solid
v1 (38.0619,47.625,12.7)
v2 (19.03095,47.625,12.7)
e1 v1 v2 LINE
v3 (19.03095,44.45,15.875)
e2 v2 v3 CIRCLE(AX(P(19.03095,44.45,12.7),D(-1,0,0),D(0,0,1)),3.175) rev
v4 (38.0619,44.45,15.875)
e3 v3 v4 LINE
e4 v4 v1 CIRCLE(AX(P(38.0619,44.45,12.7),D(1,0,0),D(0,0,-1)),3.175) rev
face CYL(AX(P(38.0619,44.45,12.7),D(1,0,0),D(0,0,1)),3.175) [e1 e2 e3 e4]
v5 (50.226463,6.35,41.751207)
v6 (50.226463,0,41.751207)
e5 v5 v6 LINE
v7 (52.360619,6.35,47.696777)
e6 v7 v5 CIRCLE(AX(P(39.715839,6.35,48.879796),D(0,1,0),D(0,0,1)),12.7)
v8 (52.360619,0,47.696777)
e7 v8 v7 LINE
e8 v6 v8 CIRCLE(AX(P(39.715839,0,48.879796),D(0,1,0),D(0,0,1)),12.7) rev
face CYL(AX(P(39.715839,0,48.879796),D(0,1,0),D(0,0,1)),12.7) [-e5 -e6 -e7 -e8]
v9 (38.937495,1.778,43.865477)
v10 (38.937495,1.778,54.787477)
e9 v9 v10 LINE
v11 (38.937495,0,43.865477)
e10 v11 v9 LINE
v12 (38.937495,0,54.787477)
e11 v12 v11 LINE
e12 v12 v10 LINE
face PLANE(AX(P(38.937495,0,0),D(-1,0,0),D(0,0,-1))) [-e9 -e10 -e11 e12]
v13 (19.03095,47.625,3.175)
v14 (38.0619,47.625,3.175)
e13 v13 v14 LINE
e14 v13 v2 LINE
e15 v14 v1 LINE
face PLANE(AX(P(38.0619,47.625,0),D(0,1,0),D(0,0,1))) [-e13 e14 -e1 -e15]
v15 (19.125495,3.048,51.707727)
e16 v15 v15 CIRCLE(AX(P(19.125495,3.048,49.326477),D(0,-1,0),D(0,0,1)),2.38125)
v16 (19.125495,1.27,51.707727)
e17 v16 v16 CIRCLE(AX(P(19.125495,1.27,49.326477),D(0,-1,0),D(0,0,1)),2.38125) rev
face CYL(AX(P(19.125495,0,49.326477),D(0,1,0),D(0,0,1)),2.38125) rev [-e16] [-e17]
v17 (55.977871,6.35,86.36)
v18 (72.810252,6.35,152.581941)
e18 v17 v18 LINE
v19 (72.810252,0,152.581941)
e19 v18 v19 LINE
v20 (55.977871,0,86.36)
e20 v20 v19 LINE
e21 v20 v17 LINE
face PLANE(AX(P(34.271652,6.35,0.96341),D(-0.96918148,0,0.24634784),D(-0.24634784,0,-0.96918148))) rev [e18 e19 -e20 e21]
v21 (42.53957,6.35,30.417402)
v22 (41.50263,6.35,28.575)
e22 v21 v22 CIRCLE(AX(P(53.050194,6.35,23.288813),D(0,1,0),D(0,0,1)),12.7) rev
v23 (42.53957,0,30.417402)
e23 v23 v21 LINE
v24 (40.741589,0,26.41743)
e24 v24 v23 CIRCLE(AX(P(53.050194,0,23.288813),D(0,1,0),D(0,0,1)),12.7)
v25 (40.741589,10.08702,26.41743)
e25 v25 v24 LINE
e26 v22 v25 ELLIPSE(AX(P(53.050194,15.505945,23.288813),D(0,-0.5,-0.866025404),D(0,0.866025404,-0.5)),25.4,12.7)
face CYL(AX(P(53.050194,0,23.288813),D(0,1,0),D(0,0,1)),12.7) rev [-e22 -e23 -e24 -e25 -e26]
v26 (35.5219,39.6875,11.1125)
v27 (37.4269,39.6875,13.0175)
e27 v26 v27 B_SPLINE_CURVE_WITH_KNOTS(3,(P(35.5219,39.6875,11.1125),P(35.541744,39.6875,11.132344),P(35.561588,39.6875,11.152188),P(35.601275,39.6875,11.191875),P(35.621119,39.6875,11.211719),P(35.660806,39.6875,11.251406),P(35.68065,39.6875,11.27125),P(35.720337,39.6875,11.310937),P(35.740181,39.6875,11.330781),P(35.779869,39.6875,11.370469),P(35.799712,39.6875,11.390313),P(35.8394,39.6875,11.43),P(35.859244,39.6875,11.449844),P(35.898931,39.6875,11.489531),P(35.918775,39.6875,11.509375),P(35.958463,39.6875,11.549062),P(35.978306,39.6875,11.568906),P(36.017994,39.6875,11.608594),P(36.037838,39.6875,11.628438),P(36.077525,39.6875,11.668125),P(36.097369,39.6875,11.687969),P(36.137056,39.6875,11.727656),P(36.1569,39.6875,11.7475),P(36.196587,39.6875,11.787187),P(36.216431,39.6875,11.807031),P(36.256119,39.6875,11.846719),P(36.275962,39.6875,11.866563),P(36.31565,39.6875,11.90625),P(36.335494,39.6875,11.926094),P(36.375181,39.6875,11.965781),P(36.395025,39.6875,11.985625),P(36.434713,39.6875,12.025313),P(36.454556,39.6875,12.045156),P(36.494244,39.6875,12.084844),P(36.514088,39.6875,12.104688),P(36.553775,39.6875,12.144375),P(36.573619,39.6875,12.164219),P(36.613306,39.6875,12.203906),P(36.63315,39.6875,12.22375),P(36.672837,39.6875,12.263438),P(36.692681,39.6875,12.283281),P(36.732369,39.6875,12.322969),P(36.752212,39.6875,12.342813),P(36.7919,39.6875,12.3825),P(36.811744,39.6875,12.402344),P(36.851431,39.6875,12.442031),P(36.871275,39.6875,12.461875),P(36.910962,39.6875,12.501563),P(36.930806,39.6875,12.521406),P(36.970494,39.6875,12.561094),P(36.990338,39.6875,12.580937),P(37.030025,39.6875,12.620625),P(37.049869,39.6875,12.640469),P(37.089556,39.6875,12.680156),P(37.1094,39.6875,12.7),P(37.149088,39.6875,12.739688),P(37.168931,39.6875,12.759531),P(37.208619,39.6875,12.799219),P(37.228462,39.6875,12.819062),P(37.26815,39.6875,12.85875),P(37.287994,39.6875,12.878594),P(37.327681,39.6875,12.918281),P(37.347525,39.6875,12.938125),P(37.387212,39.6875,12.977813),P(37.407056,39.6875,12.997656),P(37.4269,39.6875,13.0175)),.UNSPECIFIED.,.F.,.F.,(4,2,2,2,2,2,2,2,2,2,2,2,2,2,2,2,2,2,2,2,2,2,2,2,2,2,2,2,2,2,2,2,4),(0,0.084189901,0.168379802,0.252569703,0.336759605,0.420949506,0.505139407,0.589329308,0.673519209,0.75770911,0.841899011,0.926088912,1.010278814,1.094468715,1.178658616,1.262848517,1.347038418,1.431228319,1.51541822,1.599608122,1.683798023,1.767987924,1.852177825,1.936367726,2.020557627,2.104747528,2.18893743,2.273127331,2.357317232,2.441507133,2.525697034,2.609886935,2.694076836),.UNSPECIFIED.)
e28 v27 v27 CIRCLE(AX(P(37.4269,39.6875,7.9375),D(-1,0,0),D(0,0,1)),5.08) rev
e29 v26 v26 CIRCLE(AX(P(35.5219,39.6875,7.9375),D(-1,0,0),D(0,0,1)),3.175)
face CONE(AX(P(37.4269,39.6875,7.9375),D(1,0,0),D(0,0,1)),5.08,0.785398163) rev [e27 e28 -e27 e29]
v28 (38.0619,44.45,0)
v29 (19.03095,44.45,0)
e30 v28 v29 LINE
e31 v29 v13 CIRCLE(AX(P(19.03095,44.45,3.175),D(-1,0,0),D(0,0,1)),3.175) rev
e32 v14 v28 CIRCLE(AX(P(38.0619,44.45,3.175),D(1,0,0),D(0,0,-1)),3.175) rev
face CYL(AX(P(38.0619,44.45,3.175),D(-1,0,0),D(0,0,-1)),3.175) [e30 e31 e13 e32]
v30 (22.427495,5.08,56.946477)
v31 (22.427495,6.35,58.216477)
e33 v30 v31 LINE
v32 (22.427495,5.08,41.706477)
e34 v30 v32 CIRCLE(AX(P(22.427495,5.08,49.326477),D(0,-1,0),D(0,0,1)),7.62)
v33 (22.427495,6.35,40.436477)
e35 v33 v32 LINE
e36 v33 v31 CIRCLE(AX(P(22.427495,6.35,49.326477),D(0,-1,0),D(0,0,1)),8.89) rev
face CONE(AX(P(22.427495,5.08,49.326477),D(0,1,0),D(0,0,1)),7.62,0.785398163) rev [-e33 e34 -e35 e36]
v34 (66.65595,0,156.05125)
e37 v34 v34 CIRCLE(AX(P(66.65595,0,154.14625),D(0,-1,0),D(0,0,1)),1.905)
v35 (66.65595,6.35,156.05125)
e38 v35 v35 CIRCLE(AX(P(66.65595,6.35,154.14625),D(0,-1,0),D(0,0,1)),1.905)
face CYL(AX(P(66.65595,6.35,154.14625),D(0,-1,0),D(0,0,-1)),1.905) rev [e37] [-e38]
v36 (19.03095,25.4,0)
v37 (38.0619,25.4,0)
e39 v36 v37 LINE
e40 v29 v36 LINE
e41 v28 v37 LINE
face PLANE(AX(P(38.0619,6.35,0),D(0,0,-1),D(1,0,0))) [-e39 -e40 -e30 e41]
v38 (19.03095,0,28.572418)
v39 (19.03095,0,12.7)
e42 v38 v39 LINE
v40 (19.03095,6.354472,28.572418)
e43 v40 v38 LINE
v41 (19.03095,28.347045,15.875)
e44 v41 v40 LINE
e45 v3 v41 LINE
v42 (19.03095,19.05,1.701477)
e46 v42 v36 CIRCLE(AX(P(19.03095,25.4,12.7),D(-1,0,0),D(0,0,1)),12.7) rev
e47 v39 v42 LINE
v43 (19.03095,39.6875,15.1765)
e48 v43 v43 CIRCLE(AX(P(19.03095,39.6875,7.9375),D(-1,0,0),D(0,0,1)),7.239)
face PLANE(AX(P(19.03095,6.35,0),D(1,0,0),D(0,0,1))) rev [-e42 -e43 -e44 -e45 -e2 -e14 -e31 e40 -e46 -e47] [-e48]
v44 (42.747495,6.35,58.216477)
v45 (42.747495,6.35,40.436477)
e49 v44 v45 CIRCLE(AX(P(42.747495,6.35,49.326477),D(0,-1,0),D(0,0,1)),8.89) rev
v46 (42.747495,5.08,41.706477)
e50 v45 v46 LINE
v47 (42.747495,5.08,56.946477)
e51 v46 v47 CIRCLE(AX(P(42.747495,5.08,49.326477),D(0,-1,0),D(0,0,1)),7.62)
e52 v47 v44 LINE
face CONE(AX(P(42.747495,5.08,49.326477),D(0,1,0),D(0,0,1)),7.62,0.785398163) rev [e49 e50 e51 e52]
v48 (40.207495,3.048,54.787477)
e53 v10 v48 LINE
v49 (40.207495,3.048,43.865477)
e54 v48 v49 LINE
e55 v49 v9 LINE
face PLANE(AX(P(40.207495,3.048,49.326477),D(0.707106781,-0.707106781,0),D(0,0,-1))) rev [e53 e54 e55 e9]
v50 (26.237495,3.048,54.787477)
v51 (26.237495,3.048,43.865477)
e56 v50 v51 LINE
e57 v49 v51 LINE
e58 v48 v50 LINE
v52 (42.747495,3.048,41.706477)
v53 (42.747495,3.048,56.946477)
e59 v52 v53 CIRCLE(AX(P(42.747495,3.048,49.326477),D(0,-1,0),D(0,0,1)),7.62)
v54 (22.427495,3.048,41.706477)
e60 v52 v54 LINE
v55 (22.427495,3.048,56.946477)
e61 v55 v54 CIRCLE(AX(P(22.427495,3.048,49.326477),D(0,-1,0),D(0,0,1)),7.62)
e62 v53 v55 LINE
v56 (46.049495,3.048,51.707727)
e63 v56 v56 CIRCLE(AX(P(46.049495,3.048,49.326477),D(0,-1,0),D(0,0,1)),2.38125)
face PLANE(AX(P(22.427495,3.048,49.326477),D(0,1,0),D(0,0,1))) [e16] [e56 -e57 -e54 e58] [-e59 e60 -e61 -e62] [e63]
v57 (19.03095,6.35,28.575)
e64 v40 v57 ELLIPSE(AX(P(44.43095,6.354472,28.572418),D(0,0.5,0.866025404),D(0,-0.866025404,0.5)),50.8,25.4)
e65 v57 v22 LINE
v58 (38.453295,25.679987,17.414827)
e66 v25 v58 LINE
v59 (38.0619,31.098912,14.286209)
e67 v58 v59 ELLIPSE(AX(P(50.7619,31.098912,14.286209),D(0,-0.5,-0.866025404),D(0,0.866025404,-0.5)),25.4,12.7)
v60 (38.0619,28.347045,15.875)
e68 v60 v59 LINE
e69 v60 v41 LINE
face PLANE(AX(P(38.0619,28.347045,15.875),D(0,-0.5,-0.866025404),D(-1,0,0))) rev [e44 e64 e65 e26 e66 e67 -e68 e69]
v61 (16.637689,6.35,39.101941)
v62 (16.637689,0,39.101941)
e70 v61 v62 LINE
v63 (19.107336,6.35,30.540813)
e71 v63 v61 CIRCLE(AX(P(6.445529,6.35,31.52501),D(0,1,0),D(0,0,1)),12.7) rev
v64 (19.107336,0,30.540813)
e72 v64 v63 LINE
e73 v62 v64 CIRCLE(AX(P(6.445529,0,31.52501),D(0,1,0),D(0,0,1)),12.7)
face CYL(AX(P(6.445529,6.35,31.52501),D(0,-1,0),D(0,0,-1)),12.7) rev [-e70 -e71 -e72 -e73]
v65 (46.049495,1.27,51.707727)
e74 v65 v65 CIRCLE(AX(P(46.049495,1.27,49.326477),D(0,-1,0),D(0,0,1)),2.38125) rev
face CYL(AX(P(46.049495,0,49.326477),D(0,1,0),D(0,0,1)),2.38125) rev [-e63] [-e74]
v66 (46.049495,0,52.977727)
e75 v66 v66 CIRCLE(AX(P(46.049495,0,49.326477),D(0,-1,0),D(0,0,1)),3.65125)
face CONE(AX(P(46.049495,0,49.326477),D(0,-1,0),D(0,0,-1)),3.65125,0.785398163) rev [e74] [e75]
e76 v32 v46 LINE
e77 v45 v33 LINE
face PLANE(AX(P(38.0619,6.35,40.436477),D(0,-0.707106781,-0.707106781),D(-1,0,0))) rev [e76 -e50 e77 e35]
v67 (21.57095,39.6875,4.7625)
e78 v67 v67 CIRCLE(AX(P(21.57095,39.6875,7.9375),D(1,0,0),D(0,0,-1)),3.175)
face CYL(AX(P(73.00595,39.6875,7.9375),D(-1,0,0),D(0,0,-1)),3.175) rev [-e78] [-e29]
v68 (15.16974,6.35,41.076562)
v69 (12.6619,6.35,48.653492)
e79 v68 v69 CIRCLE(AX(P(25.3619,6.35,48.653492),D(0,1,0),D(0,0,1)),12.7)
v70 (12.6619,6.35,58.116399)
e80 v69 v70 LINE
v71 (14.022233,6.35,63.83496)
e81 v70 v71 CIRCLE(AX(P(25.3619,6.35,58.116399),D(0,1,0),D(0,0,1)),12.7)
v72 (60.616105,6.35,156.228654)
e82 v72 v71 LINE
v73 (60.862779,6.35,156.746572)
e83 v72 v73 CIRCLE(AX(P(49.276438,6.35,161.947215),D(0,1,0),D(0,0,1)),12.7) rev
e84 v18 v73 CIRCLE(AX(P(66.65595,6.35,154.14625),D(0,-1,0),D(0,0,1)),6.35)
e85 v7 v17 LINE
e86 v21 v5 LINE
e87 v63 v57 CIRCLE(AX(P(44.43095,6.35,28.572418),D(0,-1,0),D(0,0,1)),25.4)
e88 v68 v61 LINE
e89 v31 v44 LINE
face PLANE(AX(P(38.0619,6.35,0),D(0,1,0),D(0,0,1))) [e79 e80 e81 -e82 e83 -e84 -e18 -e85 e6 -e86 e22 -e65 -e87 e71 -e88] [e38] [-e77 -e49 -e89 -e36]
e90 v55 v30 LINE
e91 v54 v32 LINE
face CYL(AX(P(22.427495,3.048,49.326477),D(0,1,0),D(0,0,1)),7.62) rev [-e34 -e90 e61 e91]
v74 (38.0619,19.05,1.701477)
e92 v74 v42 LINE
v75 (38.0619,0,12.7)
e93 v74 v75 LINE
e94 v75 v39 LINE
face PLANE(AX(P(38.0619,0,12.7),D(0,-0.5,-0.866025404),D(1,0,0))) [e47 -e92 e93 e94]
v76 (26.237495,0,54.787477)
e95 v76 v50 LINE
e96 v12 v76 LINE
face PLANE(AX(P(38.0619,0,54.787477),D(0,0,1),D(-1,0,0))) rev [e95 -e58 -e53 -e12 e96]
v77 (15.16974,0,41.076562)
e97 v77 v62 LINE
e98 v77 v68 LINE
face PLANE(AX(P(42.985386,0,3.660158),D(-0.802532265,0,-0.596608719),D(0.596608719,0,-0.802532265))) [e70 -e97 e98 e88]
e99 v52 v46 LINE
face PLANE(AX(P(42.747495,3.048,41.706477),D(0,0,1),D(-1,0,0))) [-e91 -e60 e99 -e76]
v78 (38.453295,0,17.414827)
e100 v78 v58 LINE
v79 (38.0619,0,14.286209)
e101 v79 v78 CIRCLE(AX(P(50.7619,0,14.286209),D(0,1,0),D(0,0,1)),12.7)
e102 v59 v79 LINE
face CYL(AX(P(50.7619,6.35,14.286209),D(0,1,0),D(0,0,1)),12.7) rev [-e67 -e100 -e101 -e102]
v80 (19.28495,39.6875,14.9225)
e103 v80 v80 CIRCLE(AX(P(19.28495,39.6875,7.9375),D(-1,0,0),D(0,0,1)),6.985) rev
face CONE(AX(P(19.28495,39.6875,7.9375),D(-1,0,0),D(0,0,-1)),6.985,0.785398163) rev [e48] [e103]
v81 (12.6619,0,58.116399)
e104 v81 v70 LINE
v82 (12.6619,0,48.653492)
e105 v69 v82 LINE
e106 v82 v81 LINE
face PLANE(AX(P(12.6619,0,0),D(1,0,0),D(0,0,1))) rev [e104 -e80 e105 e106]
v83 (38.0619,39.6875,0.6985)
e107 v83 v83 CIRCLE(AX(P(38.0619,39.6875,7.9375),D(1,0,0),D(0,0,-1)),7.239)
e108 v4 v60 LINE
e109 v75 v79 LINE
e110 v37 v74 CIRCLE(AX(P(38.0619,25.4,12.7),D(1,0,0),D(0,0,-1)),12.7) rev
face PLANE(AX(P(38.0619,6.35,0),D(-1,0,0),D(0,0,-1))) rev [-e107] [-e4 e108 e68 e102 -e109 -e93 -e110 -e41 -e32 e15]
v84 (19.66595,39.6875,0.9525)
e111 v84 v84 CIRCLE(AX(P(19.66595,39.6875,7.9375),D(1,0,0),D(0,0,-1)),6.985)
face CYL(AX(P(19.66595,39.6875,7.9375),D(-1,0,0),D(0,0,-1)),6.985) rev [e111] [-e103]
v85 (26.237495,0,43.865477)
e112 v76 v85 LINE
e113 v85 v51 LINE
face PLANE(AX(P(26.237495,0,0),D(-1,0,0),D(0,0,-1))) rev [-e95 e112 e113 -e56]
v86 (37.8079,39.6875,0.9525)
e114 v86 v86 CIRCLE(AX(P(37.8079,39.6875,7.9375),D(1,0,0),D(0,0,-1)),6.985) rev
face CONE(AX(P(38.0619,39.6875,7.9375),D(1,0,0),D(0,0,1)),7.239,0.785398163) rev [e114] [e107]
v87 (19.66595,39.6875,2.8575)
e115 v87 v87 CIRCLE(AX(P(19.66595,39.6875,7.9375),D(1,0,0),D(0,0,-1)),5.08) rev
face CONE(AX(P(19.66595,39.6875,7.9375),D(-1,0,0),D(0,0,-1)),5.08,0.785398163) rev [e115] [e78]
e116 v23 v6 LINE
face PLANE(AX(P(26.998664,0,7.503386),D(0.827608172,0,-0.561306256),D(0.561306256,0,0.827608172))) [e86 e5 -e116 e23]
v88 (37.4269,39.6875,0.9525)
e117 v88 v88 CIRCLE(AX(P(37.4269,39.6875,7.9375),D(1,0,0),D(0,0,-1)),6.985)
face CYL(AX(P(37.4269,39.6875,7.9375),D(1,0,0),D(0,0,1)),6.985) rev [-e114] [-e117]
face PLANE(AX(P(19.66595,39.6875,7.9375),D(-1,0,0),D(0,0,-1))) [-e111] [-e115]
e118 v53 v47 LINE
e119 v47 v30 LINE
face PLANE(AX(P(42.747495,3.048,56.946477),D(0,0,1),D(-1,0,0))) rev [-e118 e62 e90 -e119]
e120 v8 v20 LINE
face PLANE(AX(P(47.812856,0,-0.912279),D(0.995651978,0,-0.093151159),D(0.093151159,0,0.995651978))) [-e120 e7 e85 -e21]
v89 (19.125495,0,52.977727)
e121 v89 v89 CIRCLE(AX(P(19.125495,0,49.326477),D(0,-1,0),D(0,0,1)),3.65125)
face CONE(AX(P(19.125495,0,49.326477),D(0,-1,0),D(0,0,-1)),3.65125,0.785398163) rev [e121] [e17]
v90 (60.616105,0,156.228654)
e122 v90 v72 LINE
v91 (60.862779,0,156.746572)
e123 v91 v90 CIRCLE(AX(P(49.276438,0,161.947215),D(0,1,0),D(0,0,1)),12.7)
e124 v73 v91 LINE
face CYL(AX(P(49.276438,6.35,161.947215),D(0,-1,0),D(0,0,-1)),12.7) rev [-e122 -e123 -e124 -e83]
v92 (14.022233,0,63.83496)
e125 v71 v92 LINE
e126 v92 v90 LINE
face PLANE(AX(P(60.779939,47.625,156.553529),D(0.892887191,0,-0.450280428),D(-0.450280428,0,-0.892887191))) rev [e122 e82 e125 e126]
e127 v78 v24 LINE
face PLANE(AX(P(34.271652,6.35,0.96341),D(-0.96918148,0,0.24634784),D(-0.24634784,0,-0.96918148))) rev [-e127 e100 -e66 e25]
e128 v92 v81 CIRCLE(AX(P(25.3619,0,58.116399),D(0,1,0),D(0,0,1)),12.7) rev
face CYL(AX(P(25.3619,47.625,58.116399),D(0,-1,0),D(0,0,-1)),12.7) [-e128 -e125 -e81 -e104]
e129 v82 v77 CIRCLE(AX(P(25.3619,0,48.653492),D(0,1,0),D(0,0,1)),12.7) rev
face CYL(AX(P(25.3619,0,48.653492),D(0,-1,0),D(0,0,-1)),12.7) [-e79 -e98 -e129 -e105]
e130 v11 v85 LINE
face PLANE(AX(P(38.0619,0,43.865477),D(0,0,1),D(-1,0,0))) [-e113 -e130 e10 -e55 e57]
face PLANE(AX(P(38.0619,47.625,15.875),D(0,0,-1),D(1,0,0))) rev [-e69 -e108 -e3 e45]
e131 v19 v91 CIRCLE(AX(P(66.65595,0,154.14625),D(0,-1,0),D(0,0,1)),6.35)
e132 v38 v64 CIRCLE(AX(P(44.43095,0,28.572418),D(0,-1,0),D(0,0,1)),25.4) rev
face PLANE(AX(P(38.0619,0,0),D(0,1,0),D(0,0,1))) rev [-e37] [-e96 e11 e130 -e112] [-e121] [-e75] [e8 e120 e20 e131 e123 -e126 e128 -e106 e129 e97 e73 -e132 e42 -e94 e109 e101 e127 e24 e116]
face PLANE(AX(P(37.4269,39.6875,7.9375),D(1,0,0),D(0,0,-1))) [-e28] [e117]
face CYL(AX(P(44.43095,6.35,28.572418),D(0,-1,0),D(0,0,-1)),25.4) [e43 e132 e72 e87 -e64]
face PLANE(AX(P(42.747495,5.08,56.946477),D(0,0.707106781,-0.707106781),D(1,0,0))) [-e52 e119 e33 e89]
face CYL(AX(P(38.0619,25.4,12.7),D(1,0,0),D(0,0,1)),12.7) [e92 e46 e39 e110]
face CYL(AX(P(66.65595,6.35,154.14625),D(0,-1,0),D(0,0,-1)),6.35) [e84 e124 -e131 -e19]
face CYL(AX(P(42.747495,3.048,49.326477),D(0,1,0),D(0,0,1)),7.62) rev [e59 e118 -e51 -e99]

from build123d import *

# Parameters (mm, degrees)
SKETCH1_R           = 6.35
SKETCH1_R_2         = 1.905
BOSS_EXTRUDE1_DEPTH = 6.35
FILLET2_R           = 25.4
SKETCH2_W           = 19.03095
SKETCH2_H           = 15.875
BOSS_EXTRUDE2_DEPTH = 41.275
SKETCH3_R           = 3.175
CUT_EXTRUDE1_DEPTH  = 176.899083324
SKETCH4_R           = 6.985
CUT_EXTRUDE2_DEPTH  = 0.635
CHAMFER1_SIZE       = 0.254
CHAMFER2_SIZE       = 1.905
FILLET3_R           = 3.175
CHAMFER3_SIZE       = 12.7
CHAMFER3_SIZE2      = 21.997045256
SKETCH6_R           = 1.905
BOSS_EXTRUDE3_DEPTH = 6.35
CUT_EXTRUDE3_DEPTH  = 6.35
FILLET4_R           = 6.35
CHAMFER5_SIZE       = 12.7
CHAMFER5_SIZE2      = 21.997045256
FILLET5_R           = 12.7
SKETCH7_R           = 1.905
BOSS_EXTRUDE4_DEPTH = 6.35
CUT_EXTRUDE4_DEPTH  = 170.362801463
CUT_EXTRUDE5_DEPTH  = 3.302
SKETCH10_3_R        = 2.38125
SKETCH10_3_W        = 12.7
SKETCH10_3_H        = 10.922
CUT_EXTRUDE6_DEPTH  = 170.362801463
CHAMFER6_SIZE       = 1.27
CHAMFER7_SIZE       = 1.27
CUT_EXTRUDE7_DEPTH  = 183.63914045
FILLET6_R           = 12.7


with BuildPart() as part:
    # Sketch1 → Boss-Extrude1 (new body)
    # profile 1 of 2: a face of its own
    with BuildSketch(Plane(origin=(0, 0, 0), x_dir=(1, 0, 0), z_dir=(0, 1, 0))):
        with BuildLine():
            Line((0, -15.875), (-34.748352364, -152.581941075))
            ThreePointArc((-34.748352364, -152.581941075), (-27.805798775, -147.845364348), (-22.24405, -154.14625))
            ThreePointArc((-22.24405, -154.14625), (-22.363673933, -155.372999389), (-22.718038681, -156.553528751))
            Line((-22.718038681, -156.553528751), (3.697461152, -92.075))
            Line((3.697461152, -92.075), (19.03095, -31.75))
            Line((19.03095, -31.75), (19.03095, 0))
            Line((19.03095, 0), (0, 0))
            Line((0, 0), (0, -15.875))
        make_face()
    # profile 2 of 2: a face of its own
    with BuildSketch(Plane(origin=(0, 0, 0), x_dir=(1, 0, 0), z_dir=(0, 1, 0))):
        with Locations((-28.59405, -154.14625)):
            Circle(SKETCH1_R)
        with Locations(Location((-28.59405, -154.14625, 0), (0, 0, 270))):
            Circle(SKETCH1_R_2, mode=Mode.SUBTRACT)
    extrude(amount=BOSS_EXTRUDE1_DEPTH)

    # Fillet2
    fillet2_edges = [part.edges().sort_by_distance(p)[0] for p in [
        (19.03095, 3.175, 31.75),
        (3.697461152, 3.175, 92.075),
    ]]
    fillet(fillet2_edges, radius=FILLET2_R)

    # Sketch2 → Boss-Extrude2 (add)
    with BuildSketch(Plane(origin=(0, 6.35, 0), x_dir=(1, 0, 0), z_dir=(0, 1, 0))):
        with Locations((9.515475, -7.9375)):
            Rectangle(SKETCH2_W, SKETCH2_H)
    extrude(amount=BOSS_EXTRUDE2_DEPTH)

    # Sketch3 → Cut-Extrude1 (cut, through all)
    with BuildSketch(Plane(origin=(19.03095, 0, 0), x_dir=(0, 0, -1), z_dir=(1, 0, 0))):
        with Locations((-7.9375, 39.6875)):
            Circle(SKETCH3_R)
    extrude(amount=-CUT_EXTRUDE1_DEPTH, mode=Mode.SUBTRACT)

    # Sketch4 → Cut-Extrude2 (cut)
    with BuildSketch(Plane(origin=(19.03095, 0, 0), x_dir=(0, 0, -1), z_dir=(1, 0, 0))):
        with Locations((-7.9375, 39.6875)):
            Circle(SKETCH4_R)
    cut_extrude2 = extrude(amount=-CUT_EXTRUDE2_DEPTH, mode=Mode.SUBTRACT)

    # Mirror1: Cut-Extrude2 across plane
    add(cut_extrude2.mirror(Plane(origin=(9.515475, 0, 0), x_dir=(0, 0, 1), z_dir=(1, 0, 0))), mode=Mode.SUBTRACT)

    # Chamfer1
    chamfer1_edges = [part.edges().sort_by_distance(p)[0] for p in [
        (19.03095, 39.6875, 14.9225),
        (0, 39.6875, 14.9225),
    ]]
    chamfer(chamfer1_edges, length=CHAMFER1_SIZE)

    # Chamfer2
    chamfer2_edges = [part.edges().sort_by_distance(p)[0] for p in [
        (18.39595, 39.6875, 11.1125),
        (0.635, 39.6875, 11.1125),
    ]]
    chamfer(chamfer2_edges, length=CHAMFER2_SIZE)

    # Fillet3
    fillet3_edges = [part.edges().sort_by_distance(p)[0] for p in [
        (9.515475, 47.625, 0),
        (9.515475, 47.625, 15.875),
    ]]
    fillet(fillet3_edges, radius=FILLET3_R)

    # Chamfer3
    chamfer3_edges = [part.edges().sort_by_distance(p)[0] for p in [
        (9.515475, 6.35, 15.875),
    ]]
    chamfer3_side = [part.faces().sort_by_distance(p)[0] for p in [
        (-6.326800104, 6.35, 82.033556201),
    ]]
    chamfer(chamfer3_edges, length=CHAMFER3_SIZE, length2=CHAMFER3_SIZE2, reference=chamfer3_side[0])

    # Sketch6 → Boss-Extrude3 (add)
    # profile 1 of 2: a face of its own
    with BuildSketch(Plane(origin=(0, 6.35, 0), x_dir=(1, 0, 0), z_dir=(0, 1, 0))):
        with BuildLine():
            Line((-8.255, -44.45), (-6.925228458, -43.120228458))
            Line((-6.925228458, -43.120228458), (-3.228102915, -28.575))
            Line((-3.228102915, -28.575), (-13.99495746, -44.45))
            Line((-13.99495746, -44.45), (-15.073361931, -55.976593532))
            ThreePointArc((-15.073361931, -55.976593532), (-20.292390061, -61.638490142), (-16.214172451, -68.17021801))
            Line((-16.214172451, -68.17021801), (-17.91597118, -86.36))
            Line((-17.91597118, -86.36), (-8.255, -48.351814634))
            Line((-8.255, -48.351814634), (-8.255, -44.45))
        make_face()
        with Locations(Location((-13.97, -62.23, 0), (0, 0, 270))):
            Circle(SKETCH6_R, mode=Mode.SUBTRACT)
    # profile 2 of 2: a face of its own
    with BuildSketch(Plane(origin=(0, 6.35, 0), x_dir=(1, 0, 0), z_dir=(0, 1, 0))):
        with BuildLine():
            Line((18.248159602, -34.82965338), (4.135908565, -90.350060527))
            ThreePointArc((4.135908565, -90.350060527), (3.638321539, -92.055476142), (3.022744588, -93.721939549))
            Line((3.022744588, -93.721939549), (-22.718038594, -156.553528537))
            Line((-22.718038594, -156.553528537), (25.4, -86.36))
            Line((25.4, -86.36), (25.4, -68.58))
            ThreePointArc((25.4, -68.58), (31.75, -62.23), (25.4, -55.88))
            Line((25.4, -55.88), (25.4, -44.45))
            Line((25.4, -44.45), (18.248159602, -34.82965338))
        make_face()
        with Locations(Location((25.4, -62.23, 0), (0, 0, 270))):
            Circle(SKETCH6_R, mode=Mode.SUBTRACT)
    extrude(amount=-BOSS_EXTRUDE3_DEPTH)

    # Sketch6<3> → Cut-Extrude3 (cut)
    with BuildSketch(Plane(origin=(0, 6.35, 0), x_dir=(1, 0, 0), z_dir=(0, 1, 0))):
        Polygon((-1.905, -38.1), (13.335, -38.1), (19.685, -44.45), (19.685, -86.36), (-8.255, -86.36), (-8.255, -44.45), align=None)
    extrude(amount=-CUT_EXTRUDE3_DEPTH, mode=Mode.SUBTRACT)

    # Fillet4
    fillet4_edges = [part.edges().sort_by_distance(p)[0] for p in [
        (25.4, 3.175, 55.88),
        (25.4, 3.175, 68.58),
        (25.4, 3.175, 86.36),
        (-16.214172451, 3.175, 68.17021801),
        (-15.073361931, 3.175, 55.976593532),
    ]]
    fillet(fillet4_edges, radius=FILLET4_R)

    # Chamfer5
    chamfer5_edges = [part.edges().sort_by_distance(p)[0] for p in [
        (9.515475, 0, 0),
    ]]
    chamfer5_side = [part.faces().sort_by_distance(p)[0] for p in [
        (-0.648785112, 0, 121.285485339),
    ]]
    chamfer(chamfer5_edges, length=CHAMFER5_SIZE, length2=CHAMFER5_SIZE2, reference=chamfer5_side[0])

    # Fillet5
    fillet5_edges = [part.edges().sort_by_distance(p)[0] for p in [
        (9.515475, 21.997045256, 0),
    ]]
    fillet(fillet5_edges, radius=FILLET5_R)

    # Sketch7 → Boss-Extrude4 (add)
    with BuildSketch(Plane(origin=(0, 6.35, 0), x_dir=(1, 0, 0), z_dir=(0, 1, 0))):
        with Locations((-13.97, -62.23)):
            Circle(SKETCH7_R)
        with Locations((25.4, -62.23)):
            Circle(SKETCH7_R)
        Polygon((-8.255, -86.36), (19.685, -86.36), (19.685, -44.45), (13.335, -38.1), (-1.905, -38.1), (-8.255, -44.45), align=None)
    extrude(amount=-BOSS_EXTRUDE4_DEPTH)

    # Sketch9 → Cut-Extrude4 (cut, through all)
    with BuildSketch(Plane(origin=(0, 6.35, 0), x_dir=(1, 0, 0), z_dir=(0, 1, 0))):
        with BuildLine():
            Line((-14.727319743, -52.277899988), (-16.560214639, -71.868911554))
            ThreePointArc((-16.560214639, -71.868911554), (-16.917171132, -69.101142904), (-18.42630235, -66.753700848))
            ThreePointArc((-18.42630235, -66.753700848), (-20.292390061, -61.638490142), (-17.509854902, -56.958195065))
            ThreePointArc((-17.509854902, -56.958195065), (-15.591481206, -54.931423346), (-14.727319743, -52.277899988))
        make_face()
        with BuildLine():
            Line((25.4, -73.228522628), (25.4, -51.231477372))
            ThreePointArc((25.4, -51.231477372), (26.250738686, -54.406477372), (28.575, -56.730738686))
            ThreePointArc((28.575, -56.730738686), (31.75, -62.23), (28.575, -67.729261314))
            ThreePointArc((28.575, -67.729261314), (26.250738686, -70.053522628), (25.4, -73.228522628))
        make_face()
    extrude(amount=-CUT_EXTRUDE4_DEPTH, mode=Mode.SUBTRACT)

    # Sketch10 → Cut-Extrude5 (cut)
    with BuildSketch(Plane(origin=(0, 6.35, 0), x_dir=(1, 0, 0), z_dir=(0, 1, 0))):
        with BuildLine():
            Line((-4.685595345, -41.706477372), (15.634404655, -41.706477372))
            ThreePointArc((15.634404655, -41.706477372), (23.254404655, -49.326477372), (15.634404655, -56.946477372))
            Line((15.634404655, -56.946477372), (-4.685595345, -56.946477372))
            ThreePointArc((-4.685595345, -56.946477372), (-12.305595345, -49.326477372), (-4.685595345, -41.706477372))
        make_face()
    extrude(amount=-CUT_EXTRUDE5_DEPTH, mode=Mode.SUBTRACT)

    # Sketch10<3> → Cut-Extrude6 (cut, through all)
    with BuildSketch(Plane(origin=(0, 6.35, 0), x_dir=(1, 0, 0), z_dir=(0, 1, 0))):
        with Locations(Location((-7.987595345, -49.326477372, 0), (0, 0, 270))):
            Circle(SKETCH10_3_R)
        with Locations((5.474404655, -49.326477372)):
            Rectangle(SKETCH10_3_W, SKETCH10_3_H)
        with Locations(Location((18.936404655, -49.326477372, 0), (0, 0, 270))):
            Circle(SKETCH10_3_R)
    extrude(amount=-CUT_EXTRUDE6_DEPTH, mode=Mode.SUBTRACT)

    # Chamfer6
    chamfer6_edges = [part.edges().sort_by_distance(p)[0] for p in [
        (5.474404655, 6.35, 41.706477372),
        (-12.305595345, 6.35, 49.326477372),
        (5.474404655, 6.35, 56.946477372),
        (23.254404655, 6.35, 49.326477372),
        (-0.875595345, 3.048, 49.326477372),
    ]]
    chamfer(chamfer6_edges, length=CHAMFER6_SIZE)

    # Chamfer7
    chamfer7_edges = [part.edges().sort_by_distance(p)[0] for p in [
        (-7.987595345, 0, 46.945227372),
        (18.936404655, 0, 46.945227372),
    ]]
    chamfer(chamfer7_edges, length=CHAMFER7_SIZE)


with BuildPart() as body_2:
    # Mirror2: read off the stored shape, not the designer's step
    # Mirror2: mirrored copy
    add(part.part.mirror(Plane.YZ.offset(19.03095)))

    # Sketch11 → Cut-Extrude7 (cut, through all)
    with BuildSketch(Plane.XZ):
        with BuildLine():
            Line((60.779938594, 156.553528537), (12.6619, 61.137477372))
            Line((12.6619, 61.137477372), (12.6619, 84.392473417))
            ThreePointArc((12.6619, 84.392473417), (12.946388069, 86.271852309), (13.774361424, 87.982834076))
            Line((13.774361424, 87.982834076), (60.779938594, 156.553528537))
        make_face()
    extrude(amount=-CUT_EXTRUDE7_DEPTH, mode=Mode.SUBTRACT)

    # Fillet6
    # the kernel refuses this fillet: 12.7 mm, written as the material it adds along each edge
    with BuildSketch(Plane(origin=(41.290002915, 11.915442624, 28.575), x_dir=(0.5613062559258853, 0, 0.8276081724212639), z_dir=(0, -1, 0))) as fillet6_piece_1_section:
        with BuildLine():
            CenterArc((FILLET6_R * 0.17528953146, -FILLET6_R), FILLET6_R, 90, 19.884681412)
            Line((-FILLET6_R * 0.164838611345, -FILLET6_R * 0.0596209027884), (0, 0))
            Line((0, 0), (FILLET6_R * 0.17528953146, 0))
        make_face()
    fillet6_piece_1 = extrude(amount=11.915442624, mode=Mode.PRIVATE)
    fillet6_piece_1 = split(fillet6_piece_1, bisect_by=Plane(origin=(41.290002915, 10.524081968, 26.165092652), z_dir=(0, -0.49999999999999806, -0.8660254037844398)), keep=Keep.TOP, mode=Mode.PRIVATE)
    add(fillet6_piece_1)
    with BuildSketch(Plane(origin=(41.290002915, 6.35, 28.575), x_dir=(0.5613062559258853, 0, 0.8276081724212639), z_dir=(0, -1, 0))) as fillet6_piece_2_section:
        with BuildLine():
            CenterArc((FILLET6_R * 0.17528953146, -FILLET6_R), FILLET6_R, 90, 19.884681412)
            Line((-FILLET6_R * 0.164838611345, -FILLET6_R * 0.0596209027884), (0, 0))
            Line((0, 0), (FILLET6_R * 0.17528953146, 0))
        make_face()
    fillet6_piece_2 = extrude(amount=11.915442624, mode=Mode.PRIVATE)
    fillet6_piece_2 = split(fillet6_piece_2, bisect_by=Plane(origin=(41.290002915, 6.35, 28.575), z_dir=(0, 0.49999999999999806, 0.8660254037844398)), keep=Keep.TOP, mode=Mode.PRIVATE)
    add(fillet6_piece_2)
    with BuildSketch(Plane(origin=(38.0619, 0, 15.875), x_dir=(0.24634783955161182, 0, 0.9691814803989258), z_dir=(0, 1, 0))) as fillet6_piece_3_section:
        with BuildLine():
            CenterArc((FILLET6_R * 0.125101643502, FILLET6_R), FILLET6_R, 255.73849915, 14.26150085)
            Line((-FILLET6_R * 0.12124619605, FILLET6_R * 0.0308185196011), (0, 0))
            Line((0, 0), (FILLET6_R * 0.125101643502, 0))
        make_face()
    fillet6_piece_3 = extrude(amount=32.319022437, mode=Mode.PRIVATE)
    fillet6_piece_3 = split(fillet6_piece_3, bisect_by=Plane(origin=(38.0619, 7.086761314, 28.149630657), z_dir=(0, -0.49999999999999806, -0.8660254037844398)), keep=Keep.TOP, mode=Mode.PRIVATE)
    add(fillet6_piece_3)
    with BuildSketch(Plane(origin=(60.779938681, 0, 156.553528751), x_dir=(-0.4502803833327004, 0, -0.892887213698212), z_dir=(0, 1, 0))) as fillet6_piece_4:
        with BuildLine():
            CenterArc((0.363846893, 12.7), FILLET6_R, 267.411723266, 2.588279583)
            ThreePointArc((-0.209667177, 0.012956152), (-0.104780009, 0.007345146), (0, 0))
            Line((0, 0), (0.363847525, 0))
        make_face()
    extrude(amount=6.35)
    with BuildSketch(Plane(origin=(19.813740398, 0, 34.82965338), x_dir=(-0.1625178407980129, 0, -0.9867056052452279), z_dir=(0, 1, 0))) as fillet6_piece_5:
        with BuildLine():
            CenterArc((5.433283049, 12.653425521), FILLET6_R, 224.019529776, 41.072040405)
            Line((-3.699324772, 3.828150773), (0, 0))
            ThreePointArc((0, 0), (2.17331322, 0.093148958), (4.34662644, 0))
        make_face()
    extrude(amount=6.35)
    # the kernel refuses this fillet: 12.7 mm, written as the material it takes off along each edge
    with BuildSketch(Plane(origin=(12.6619, 16.858731076, 44.45), x_dir=(0.5966087190088384, 0, -0.8025322650228044), z_dir=(0, -1, 0))) as fillet6_2_piece_1:
        with BuildLine():
            CenterArc((FILLET6_R * 0.33098365593, FILLET6_R), FILLET6_R, 233.372600808, 36.627399192)
            Line((-FILLET6_R * 0.265625063079, FILLET6_R * 0.197467734977), (0, 0))
            Line((0, 0), (FILLET6_R * 0.33098365593, 0))
        make_face()
    extrude(amount=27.367462152, mode=Mode.SUBTRACT)
    with BuildSketch(Plane(origin=(52.05685746, 14.502388088, 44.45), x_dir=(0.0931511588181929, 0, 0.9956519781584466), z_dir=(0, -1, 0))) as fillet6_2_piece_2:
        with BuildLine():
            CenterArc((FILLET6_R * 0.25676812876, FILLET6_R), FILLET6_R, 241.198734849, 28.801265151)
            Line((-FILLET6_R * 0.225004894996, FILLET6_R * 0.123703957797), (0, 0))
            Line((0, 0), (FILLET6_R * 0.25676812876, 0))
        make_face()
    extrude(amount=22.654776176, mode=Mode.SUBTRACT)
    with BuildSketch(Plane(origin=(12.6619, -7.55269709, 61.137477372), x_dir=(0, 0, -1), z_dir=(0, 1, 0))) as fillet6_2_piece_3:
        with BuildLine():
            CenterArc((FILLET6_R * 0.237880223292, -FILLET6_R), FILLET6_R, 90, 26.761677325)
            Line((-FILLET6_R * 0.212400204442, -FILLET6_R * 0.107112808693), (0, 0))
            Line((0, 0), (FILLET6_R * 0.237880223292, 0))
        make_face()
    extrude(amount=21.455394179, mode=Mode.SUBTRACT)


solid = body_2.part
